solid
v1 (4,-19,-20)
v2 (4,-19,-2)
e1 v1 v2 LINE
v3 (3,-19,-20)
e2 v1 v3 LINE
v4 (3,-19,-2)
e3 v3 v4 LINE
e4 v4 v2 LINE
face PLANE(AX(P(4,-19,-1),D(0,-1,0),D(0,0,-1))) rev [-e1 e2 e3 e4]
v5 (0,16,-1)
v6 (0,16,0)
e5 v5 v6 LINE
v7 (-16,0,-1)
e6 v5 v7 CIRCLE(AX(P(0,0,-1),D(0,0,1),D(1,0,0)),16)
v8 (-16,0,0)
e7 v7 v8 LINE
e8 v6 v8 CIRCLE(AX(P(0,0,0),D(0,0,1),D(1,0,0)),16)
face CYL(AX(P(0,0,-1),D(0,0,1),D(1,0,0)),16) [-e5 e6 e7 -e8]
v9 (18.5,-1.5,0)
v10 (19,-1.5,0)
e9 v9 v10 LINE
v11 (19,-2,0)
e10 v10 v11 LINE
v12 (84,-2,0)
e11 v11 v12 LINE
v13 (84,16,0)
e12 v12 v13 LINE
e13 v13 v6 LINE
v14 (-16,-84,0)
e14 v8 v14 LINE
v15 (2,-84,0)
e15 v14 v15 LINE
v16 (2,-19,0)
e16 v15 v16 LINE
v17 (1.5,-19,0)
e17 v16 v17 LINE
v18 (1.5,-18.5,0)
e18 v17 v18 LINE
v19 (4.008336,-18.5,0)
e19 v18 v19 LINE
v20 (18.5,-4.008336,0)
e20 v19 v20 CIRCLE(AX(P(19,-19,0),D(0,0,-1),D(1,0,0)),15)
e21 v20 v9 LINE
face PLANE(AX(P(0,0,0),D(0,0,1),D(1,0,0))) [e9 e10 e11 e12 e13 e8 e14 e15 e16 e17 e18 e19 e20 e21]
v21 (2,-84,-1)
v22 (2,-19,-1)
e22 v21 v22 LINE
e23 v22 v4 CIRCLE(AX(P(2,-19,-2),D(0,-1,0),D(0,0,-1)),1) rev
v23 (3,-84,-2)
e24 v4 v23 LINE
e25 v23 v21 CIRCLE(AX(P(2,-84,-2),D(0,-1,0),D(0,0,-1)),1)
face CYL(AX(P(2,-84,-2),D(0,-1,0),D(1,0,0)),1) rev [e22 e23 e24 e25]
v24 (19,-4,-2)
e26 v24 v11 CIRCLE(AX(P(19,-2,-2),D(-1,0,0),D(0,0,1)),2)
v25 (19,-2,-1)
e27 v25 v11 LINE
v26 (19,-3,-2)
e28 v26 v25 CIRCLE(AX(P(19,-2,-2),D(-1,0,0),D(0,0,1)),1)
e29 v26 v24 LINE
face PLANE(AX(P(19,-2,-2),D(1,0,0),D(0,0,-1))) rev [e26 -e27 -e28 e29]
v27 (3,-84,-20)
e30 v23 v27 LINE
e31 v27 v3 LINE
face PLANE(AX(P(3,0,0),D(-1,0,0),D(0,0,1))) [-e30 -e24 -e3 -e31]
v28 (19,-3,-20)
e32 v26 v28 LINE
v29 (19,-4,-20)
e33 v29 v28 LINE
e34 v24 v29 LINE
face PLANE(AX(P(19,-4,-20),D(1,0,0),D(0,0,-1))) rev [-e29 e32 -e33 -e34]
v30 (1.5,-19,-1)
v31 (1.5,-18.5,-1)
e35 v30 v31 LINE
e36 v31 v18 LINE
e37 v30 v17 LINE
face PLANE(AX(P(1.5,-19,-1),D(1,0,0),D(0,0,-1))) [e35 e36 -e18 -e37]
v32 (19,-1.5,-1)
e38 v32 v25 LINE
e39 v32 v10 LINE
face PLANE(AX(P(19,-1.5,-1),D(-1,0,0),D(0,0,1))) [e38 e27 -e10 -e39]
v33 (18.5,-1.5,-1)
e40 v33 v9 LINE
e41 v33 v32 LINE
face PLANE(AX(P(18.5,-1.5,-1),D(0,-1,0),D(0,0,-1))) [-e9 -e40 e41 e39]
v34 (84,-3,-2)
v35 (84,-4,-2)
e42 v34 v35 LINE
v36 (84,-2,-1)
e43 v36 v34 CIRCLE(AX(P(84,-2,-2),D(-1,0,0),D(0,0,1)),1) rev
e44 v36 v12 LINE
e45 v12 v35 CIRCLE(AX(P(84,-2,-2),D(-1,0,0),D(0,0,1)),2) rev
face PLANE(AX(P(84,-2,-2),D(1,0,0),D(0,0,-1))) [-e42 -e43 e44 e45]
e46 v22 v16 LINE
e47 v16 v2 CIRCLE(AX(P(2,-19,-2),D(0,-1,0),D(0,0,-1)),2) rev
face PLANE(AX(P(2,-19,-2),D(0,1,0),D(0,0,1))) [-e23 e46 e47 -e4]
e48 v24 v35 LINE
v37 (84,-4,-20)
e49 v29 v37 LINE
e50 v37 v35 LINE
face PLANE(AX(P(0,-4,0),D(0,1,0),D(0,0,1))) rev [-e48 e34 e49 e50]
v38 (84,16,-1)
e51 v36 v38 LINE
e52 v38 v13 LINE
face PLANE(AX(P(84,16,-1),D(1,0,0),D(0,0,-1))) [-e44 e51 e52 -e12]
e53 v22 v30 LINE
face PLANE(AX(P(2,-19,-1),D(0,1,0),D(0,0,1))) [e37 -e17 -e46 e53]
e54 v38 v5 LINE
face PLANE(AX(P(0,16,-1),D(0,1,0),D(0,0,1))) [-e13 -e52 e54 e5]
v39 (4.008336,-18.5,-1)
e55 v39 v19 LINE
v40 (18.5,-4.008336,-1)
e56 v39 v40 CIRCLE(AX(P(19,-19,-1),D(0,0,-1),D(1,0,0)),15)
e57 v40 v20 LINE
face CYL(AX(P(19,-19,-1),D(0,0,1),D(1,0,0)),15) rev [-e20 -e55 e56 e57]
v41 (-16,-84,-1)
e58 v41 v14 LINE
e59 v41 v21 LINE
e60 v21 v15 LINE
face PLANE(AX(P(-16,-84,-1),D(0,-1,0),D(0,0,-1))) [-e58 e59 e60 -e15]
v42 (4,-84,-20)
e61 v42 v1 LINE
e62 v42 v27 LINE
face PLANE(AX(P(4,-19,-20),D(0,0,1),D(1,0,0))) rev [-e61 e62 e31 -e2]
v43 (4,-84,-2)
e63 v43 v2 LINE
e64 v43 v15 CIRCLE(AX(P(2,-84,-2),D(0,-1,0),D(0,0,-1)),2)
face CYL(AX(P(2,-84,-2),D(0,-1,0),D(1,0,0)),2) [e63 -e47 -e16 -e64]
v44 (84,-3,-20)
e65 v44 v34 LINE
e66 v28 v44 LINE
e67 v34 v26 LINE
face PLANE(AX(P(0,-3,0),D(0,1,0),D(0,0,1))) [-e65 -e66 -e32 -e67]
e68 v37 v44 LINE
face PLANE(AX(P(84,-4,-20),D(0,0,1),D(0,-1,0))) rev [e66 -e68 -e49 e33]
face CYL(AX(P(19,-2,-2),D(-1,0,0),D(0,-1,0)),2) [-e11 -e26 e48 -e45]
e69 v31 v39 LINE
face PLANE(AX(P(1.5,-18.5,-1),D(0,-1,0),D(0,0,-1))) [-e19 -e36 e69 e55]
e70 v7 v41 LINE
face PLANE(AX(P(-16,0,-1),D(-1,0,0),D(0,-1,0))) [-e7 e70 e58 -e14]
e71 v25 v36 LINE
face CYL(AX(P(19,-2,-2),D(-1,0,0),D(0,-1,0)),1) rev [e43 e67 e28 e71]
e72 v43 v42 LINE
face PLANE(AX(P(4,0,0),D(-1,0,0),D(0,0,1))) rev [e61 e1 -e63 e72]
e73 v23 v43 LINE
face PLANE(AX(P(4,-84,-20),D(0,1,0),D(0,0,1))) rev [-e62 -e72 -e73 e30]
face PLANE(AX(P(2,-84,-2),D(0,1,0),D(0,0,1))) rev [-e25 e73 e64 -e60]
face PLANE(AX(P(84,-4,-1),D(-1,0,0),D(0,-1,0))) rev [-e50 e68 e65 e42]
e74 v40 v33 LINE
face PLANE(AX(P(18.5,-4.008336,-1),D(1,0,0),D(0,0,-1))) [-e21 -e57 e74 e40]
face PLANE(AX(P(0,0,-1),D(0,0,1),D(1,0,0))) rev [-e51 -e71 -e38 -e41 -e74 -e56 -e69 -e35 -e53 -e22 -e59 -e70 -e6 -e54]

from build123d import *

# Parameters (mm, degrees)
BASE_FLANGE1_DEPTH              = 1
EDGE_FLANGE1_STRIP_W            = 6
EDGE_FLANGE1_STRIP_H            = 1
EDGE_FLANGE1_STRIP_CUT_DEPTH    = 65
EDGE_FLANGE1_RELIEF_W           = 6.5
EDGE_FLANGE1_RELIEF_H           = 0.5
EDGE_FLANGE1_RELIEF_CUT_DEPTH   = 1
EDGE_FLANGE1_STRIP_2_W          = 6
EDGE_FLANGE1_STRIP_2_H          = 1
EDGE_FLANGE1_STRIP_CUT_2_DEPTH  = 65
EDGE_FLANGE1_RELIEF_2_W         = 6.5
EDGE_FLANGE1_RELIEF_2_H         = 0.5
EDGE_FLANGE1_RELIEF_CUT_2_DEPTH = 1
EDGE_FLANGE1_DEPTH              = 65
EDGE_FLANGE1_BEND_DEPTH         = 65


# Sheet-metal steps are written as plain solids
with BuildPart() as part:
    # Sketch1 → Base-Flange1 (new body)
    with BuildSketch(Plane.XY):
        with BuildLine():
            Line((-16, 0), (-16, -84))
            Line((-16, -84), (4, -84))
            Line((4, -84), (4, -19))
            ThreePointArc((4, -19), (8.393398282, -8.393398282), (19, -4))
            Line((19, -4), (84, -4))
            Line((84, -4), (84, 16))
            Line((84, 16), (0, 16))
            ThreePointArc((0, 16), (-11.313708499, 11.313708499), (-16, 0))
        make_face()
    extrude(amount=-BASE_FLANGE1_DEPTH)

    # Edge-Flange1 strip (across the edge) → Edge-Flange1 strip cut (cut)
    with BuildSketch(Plane(origin=(84, -4, -1), x_dir=(0, 1, 0), z_dir=(-1, 0, 0))):
        with Locations((-1, -0.5)):
            Rectangle(EDGE_FLANGE1_STRIP_W, EDGE_FLANGE1_STRIP_H)
    extrude(amount=EDGE_FLANGE1_STRIP_CUT_DEPTH, mode=Mode.SUBTRACT)

    # Edge-Flange1 relief (on the sheet) → Edge-Flange1 relief cut (cut)
    with BuildSketch(Plane(origin=(84, -2, -1), x_dir=(0, 1, 0), z_dir=(0, 0, -1))):
        with Locations((-2.75, -65.25)):
            Rectangle(EDGE_FLANGE1_RELIEF_W, EDGE_FLANGE1_RELIEF_H)
    extrude(amount=-EDGE_FLANGE1_RELIEF_CUT_DEPTH, mode=Mode.SUBTRACT)

    # Edge-Flange1 strip 2 (across the edge) → Edge-Flange1 strip cut 2 (cut)
    with BuildSketch(Plane(origin=(4, -19, -1), x_dir=(-1, 0, 0), z_dir=(0, -1, 0))):
        with Locations((-1, -0.5)):
            Rectangle(EDGE_FLANGE1_STRIP_2_W, EDGE_FLANGE1_STRIP_2_H)
    extrude(amount=EDGE_FLANGE1_STRIP_CUT_2_DEPTH, mode=Mode.SUBTRACT)

    # Edge-Flange1 relief 2 (on the sheet) → Edge-Flange1 relief cut 2 (cut)
    with BuildSketch(Plane(origin=(2, -19, -1), x_dir=(-1, 0, 0), z_dir=(0, 0, -1))):
        with Locations((-2.75, 0.25)):
            Rectangle(EDGE_FLANGE1_RELIEF_2_W, EDGE_FLANGE1_RELIEF_2_H)
    extrude(amount=-EDGE_FLANGE1_RELIEF_CUT_2_DEPTH, mode=Mode.SUBTRACT)

    # Edge-Flange1 section (across the edge) → Edge-Flange1 (add)
    with BuildSketch(Plane(origin=(84, -4, -1), x_dir=(0, 1, 0), z_dir=(-1, 0, 0))):
        with BuildLine():
            Line((0, 1), (0, 19))
            Line((0, 19), (1, 19))
            Line((1, 19), (1, 1))
            ThreePointArc((1, 1), (1.292893219, 0.292893219), (2, 0))
            Line((2, 0), (2, -1))
            ThreePointArc((2, -1), (0.585786438, -0.414213562), (0, 1))
        make_face()
    extrude(amount=EDGE_FLANGE1_DEPTH)

    # Edge-Flange1 section 2 (across the edge) → Edge-Flange1 bend (add)
    with BuildSketch(Plane(origin=(4, -19, -1), x_dir=(-1, 0, 0), z_dir=(0, -1, 0))):
        with BuildLine():
            Line((0, 1), (0, 19))
            Line((0, 19), (1, 19))
            Line((1, 19), (1, 1))
            ThreePointArc((1, 1), (1.292893219, 0.292893219), (2, 0))
            Line((2, 0), (2, -1))
            ThreePointArc((2, -1), (0.585786438, -0.414213562), (0, 1))
        make_face()
    extrude(amount=EDGE_FLANGE1_BEND_DEPTH)


solid = part.part
